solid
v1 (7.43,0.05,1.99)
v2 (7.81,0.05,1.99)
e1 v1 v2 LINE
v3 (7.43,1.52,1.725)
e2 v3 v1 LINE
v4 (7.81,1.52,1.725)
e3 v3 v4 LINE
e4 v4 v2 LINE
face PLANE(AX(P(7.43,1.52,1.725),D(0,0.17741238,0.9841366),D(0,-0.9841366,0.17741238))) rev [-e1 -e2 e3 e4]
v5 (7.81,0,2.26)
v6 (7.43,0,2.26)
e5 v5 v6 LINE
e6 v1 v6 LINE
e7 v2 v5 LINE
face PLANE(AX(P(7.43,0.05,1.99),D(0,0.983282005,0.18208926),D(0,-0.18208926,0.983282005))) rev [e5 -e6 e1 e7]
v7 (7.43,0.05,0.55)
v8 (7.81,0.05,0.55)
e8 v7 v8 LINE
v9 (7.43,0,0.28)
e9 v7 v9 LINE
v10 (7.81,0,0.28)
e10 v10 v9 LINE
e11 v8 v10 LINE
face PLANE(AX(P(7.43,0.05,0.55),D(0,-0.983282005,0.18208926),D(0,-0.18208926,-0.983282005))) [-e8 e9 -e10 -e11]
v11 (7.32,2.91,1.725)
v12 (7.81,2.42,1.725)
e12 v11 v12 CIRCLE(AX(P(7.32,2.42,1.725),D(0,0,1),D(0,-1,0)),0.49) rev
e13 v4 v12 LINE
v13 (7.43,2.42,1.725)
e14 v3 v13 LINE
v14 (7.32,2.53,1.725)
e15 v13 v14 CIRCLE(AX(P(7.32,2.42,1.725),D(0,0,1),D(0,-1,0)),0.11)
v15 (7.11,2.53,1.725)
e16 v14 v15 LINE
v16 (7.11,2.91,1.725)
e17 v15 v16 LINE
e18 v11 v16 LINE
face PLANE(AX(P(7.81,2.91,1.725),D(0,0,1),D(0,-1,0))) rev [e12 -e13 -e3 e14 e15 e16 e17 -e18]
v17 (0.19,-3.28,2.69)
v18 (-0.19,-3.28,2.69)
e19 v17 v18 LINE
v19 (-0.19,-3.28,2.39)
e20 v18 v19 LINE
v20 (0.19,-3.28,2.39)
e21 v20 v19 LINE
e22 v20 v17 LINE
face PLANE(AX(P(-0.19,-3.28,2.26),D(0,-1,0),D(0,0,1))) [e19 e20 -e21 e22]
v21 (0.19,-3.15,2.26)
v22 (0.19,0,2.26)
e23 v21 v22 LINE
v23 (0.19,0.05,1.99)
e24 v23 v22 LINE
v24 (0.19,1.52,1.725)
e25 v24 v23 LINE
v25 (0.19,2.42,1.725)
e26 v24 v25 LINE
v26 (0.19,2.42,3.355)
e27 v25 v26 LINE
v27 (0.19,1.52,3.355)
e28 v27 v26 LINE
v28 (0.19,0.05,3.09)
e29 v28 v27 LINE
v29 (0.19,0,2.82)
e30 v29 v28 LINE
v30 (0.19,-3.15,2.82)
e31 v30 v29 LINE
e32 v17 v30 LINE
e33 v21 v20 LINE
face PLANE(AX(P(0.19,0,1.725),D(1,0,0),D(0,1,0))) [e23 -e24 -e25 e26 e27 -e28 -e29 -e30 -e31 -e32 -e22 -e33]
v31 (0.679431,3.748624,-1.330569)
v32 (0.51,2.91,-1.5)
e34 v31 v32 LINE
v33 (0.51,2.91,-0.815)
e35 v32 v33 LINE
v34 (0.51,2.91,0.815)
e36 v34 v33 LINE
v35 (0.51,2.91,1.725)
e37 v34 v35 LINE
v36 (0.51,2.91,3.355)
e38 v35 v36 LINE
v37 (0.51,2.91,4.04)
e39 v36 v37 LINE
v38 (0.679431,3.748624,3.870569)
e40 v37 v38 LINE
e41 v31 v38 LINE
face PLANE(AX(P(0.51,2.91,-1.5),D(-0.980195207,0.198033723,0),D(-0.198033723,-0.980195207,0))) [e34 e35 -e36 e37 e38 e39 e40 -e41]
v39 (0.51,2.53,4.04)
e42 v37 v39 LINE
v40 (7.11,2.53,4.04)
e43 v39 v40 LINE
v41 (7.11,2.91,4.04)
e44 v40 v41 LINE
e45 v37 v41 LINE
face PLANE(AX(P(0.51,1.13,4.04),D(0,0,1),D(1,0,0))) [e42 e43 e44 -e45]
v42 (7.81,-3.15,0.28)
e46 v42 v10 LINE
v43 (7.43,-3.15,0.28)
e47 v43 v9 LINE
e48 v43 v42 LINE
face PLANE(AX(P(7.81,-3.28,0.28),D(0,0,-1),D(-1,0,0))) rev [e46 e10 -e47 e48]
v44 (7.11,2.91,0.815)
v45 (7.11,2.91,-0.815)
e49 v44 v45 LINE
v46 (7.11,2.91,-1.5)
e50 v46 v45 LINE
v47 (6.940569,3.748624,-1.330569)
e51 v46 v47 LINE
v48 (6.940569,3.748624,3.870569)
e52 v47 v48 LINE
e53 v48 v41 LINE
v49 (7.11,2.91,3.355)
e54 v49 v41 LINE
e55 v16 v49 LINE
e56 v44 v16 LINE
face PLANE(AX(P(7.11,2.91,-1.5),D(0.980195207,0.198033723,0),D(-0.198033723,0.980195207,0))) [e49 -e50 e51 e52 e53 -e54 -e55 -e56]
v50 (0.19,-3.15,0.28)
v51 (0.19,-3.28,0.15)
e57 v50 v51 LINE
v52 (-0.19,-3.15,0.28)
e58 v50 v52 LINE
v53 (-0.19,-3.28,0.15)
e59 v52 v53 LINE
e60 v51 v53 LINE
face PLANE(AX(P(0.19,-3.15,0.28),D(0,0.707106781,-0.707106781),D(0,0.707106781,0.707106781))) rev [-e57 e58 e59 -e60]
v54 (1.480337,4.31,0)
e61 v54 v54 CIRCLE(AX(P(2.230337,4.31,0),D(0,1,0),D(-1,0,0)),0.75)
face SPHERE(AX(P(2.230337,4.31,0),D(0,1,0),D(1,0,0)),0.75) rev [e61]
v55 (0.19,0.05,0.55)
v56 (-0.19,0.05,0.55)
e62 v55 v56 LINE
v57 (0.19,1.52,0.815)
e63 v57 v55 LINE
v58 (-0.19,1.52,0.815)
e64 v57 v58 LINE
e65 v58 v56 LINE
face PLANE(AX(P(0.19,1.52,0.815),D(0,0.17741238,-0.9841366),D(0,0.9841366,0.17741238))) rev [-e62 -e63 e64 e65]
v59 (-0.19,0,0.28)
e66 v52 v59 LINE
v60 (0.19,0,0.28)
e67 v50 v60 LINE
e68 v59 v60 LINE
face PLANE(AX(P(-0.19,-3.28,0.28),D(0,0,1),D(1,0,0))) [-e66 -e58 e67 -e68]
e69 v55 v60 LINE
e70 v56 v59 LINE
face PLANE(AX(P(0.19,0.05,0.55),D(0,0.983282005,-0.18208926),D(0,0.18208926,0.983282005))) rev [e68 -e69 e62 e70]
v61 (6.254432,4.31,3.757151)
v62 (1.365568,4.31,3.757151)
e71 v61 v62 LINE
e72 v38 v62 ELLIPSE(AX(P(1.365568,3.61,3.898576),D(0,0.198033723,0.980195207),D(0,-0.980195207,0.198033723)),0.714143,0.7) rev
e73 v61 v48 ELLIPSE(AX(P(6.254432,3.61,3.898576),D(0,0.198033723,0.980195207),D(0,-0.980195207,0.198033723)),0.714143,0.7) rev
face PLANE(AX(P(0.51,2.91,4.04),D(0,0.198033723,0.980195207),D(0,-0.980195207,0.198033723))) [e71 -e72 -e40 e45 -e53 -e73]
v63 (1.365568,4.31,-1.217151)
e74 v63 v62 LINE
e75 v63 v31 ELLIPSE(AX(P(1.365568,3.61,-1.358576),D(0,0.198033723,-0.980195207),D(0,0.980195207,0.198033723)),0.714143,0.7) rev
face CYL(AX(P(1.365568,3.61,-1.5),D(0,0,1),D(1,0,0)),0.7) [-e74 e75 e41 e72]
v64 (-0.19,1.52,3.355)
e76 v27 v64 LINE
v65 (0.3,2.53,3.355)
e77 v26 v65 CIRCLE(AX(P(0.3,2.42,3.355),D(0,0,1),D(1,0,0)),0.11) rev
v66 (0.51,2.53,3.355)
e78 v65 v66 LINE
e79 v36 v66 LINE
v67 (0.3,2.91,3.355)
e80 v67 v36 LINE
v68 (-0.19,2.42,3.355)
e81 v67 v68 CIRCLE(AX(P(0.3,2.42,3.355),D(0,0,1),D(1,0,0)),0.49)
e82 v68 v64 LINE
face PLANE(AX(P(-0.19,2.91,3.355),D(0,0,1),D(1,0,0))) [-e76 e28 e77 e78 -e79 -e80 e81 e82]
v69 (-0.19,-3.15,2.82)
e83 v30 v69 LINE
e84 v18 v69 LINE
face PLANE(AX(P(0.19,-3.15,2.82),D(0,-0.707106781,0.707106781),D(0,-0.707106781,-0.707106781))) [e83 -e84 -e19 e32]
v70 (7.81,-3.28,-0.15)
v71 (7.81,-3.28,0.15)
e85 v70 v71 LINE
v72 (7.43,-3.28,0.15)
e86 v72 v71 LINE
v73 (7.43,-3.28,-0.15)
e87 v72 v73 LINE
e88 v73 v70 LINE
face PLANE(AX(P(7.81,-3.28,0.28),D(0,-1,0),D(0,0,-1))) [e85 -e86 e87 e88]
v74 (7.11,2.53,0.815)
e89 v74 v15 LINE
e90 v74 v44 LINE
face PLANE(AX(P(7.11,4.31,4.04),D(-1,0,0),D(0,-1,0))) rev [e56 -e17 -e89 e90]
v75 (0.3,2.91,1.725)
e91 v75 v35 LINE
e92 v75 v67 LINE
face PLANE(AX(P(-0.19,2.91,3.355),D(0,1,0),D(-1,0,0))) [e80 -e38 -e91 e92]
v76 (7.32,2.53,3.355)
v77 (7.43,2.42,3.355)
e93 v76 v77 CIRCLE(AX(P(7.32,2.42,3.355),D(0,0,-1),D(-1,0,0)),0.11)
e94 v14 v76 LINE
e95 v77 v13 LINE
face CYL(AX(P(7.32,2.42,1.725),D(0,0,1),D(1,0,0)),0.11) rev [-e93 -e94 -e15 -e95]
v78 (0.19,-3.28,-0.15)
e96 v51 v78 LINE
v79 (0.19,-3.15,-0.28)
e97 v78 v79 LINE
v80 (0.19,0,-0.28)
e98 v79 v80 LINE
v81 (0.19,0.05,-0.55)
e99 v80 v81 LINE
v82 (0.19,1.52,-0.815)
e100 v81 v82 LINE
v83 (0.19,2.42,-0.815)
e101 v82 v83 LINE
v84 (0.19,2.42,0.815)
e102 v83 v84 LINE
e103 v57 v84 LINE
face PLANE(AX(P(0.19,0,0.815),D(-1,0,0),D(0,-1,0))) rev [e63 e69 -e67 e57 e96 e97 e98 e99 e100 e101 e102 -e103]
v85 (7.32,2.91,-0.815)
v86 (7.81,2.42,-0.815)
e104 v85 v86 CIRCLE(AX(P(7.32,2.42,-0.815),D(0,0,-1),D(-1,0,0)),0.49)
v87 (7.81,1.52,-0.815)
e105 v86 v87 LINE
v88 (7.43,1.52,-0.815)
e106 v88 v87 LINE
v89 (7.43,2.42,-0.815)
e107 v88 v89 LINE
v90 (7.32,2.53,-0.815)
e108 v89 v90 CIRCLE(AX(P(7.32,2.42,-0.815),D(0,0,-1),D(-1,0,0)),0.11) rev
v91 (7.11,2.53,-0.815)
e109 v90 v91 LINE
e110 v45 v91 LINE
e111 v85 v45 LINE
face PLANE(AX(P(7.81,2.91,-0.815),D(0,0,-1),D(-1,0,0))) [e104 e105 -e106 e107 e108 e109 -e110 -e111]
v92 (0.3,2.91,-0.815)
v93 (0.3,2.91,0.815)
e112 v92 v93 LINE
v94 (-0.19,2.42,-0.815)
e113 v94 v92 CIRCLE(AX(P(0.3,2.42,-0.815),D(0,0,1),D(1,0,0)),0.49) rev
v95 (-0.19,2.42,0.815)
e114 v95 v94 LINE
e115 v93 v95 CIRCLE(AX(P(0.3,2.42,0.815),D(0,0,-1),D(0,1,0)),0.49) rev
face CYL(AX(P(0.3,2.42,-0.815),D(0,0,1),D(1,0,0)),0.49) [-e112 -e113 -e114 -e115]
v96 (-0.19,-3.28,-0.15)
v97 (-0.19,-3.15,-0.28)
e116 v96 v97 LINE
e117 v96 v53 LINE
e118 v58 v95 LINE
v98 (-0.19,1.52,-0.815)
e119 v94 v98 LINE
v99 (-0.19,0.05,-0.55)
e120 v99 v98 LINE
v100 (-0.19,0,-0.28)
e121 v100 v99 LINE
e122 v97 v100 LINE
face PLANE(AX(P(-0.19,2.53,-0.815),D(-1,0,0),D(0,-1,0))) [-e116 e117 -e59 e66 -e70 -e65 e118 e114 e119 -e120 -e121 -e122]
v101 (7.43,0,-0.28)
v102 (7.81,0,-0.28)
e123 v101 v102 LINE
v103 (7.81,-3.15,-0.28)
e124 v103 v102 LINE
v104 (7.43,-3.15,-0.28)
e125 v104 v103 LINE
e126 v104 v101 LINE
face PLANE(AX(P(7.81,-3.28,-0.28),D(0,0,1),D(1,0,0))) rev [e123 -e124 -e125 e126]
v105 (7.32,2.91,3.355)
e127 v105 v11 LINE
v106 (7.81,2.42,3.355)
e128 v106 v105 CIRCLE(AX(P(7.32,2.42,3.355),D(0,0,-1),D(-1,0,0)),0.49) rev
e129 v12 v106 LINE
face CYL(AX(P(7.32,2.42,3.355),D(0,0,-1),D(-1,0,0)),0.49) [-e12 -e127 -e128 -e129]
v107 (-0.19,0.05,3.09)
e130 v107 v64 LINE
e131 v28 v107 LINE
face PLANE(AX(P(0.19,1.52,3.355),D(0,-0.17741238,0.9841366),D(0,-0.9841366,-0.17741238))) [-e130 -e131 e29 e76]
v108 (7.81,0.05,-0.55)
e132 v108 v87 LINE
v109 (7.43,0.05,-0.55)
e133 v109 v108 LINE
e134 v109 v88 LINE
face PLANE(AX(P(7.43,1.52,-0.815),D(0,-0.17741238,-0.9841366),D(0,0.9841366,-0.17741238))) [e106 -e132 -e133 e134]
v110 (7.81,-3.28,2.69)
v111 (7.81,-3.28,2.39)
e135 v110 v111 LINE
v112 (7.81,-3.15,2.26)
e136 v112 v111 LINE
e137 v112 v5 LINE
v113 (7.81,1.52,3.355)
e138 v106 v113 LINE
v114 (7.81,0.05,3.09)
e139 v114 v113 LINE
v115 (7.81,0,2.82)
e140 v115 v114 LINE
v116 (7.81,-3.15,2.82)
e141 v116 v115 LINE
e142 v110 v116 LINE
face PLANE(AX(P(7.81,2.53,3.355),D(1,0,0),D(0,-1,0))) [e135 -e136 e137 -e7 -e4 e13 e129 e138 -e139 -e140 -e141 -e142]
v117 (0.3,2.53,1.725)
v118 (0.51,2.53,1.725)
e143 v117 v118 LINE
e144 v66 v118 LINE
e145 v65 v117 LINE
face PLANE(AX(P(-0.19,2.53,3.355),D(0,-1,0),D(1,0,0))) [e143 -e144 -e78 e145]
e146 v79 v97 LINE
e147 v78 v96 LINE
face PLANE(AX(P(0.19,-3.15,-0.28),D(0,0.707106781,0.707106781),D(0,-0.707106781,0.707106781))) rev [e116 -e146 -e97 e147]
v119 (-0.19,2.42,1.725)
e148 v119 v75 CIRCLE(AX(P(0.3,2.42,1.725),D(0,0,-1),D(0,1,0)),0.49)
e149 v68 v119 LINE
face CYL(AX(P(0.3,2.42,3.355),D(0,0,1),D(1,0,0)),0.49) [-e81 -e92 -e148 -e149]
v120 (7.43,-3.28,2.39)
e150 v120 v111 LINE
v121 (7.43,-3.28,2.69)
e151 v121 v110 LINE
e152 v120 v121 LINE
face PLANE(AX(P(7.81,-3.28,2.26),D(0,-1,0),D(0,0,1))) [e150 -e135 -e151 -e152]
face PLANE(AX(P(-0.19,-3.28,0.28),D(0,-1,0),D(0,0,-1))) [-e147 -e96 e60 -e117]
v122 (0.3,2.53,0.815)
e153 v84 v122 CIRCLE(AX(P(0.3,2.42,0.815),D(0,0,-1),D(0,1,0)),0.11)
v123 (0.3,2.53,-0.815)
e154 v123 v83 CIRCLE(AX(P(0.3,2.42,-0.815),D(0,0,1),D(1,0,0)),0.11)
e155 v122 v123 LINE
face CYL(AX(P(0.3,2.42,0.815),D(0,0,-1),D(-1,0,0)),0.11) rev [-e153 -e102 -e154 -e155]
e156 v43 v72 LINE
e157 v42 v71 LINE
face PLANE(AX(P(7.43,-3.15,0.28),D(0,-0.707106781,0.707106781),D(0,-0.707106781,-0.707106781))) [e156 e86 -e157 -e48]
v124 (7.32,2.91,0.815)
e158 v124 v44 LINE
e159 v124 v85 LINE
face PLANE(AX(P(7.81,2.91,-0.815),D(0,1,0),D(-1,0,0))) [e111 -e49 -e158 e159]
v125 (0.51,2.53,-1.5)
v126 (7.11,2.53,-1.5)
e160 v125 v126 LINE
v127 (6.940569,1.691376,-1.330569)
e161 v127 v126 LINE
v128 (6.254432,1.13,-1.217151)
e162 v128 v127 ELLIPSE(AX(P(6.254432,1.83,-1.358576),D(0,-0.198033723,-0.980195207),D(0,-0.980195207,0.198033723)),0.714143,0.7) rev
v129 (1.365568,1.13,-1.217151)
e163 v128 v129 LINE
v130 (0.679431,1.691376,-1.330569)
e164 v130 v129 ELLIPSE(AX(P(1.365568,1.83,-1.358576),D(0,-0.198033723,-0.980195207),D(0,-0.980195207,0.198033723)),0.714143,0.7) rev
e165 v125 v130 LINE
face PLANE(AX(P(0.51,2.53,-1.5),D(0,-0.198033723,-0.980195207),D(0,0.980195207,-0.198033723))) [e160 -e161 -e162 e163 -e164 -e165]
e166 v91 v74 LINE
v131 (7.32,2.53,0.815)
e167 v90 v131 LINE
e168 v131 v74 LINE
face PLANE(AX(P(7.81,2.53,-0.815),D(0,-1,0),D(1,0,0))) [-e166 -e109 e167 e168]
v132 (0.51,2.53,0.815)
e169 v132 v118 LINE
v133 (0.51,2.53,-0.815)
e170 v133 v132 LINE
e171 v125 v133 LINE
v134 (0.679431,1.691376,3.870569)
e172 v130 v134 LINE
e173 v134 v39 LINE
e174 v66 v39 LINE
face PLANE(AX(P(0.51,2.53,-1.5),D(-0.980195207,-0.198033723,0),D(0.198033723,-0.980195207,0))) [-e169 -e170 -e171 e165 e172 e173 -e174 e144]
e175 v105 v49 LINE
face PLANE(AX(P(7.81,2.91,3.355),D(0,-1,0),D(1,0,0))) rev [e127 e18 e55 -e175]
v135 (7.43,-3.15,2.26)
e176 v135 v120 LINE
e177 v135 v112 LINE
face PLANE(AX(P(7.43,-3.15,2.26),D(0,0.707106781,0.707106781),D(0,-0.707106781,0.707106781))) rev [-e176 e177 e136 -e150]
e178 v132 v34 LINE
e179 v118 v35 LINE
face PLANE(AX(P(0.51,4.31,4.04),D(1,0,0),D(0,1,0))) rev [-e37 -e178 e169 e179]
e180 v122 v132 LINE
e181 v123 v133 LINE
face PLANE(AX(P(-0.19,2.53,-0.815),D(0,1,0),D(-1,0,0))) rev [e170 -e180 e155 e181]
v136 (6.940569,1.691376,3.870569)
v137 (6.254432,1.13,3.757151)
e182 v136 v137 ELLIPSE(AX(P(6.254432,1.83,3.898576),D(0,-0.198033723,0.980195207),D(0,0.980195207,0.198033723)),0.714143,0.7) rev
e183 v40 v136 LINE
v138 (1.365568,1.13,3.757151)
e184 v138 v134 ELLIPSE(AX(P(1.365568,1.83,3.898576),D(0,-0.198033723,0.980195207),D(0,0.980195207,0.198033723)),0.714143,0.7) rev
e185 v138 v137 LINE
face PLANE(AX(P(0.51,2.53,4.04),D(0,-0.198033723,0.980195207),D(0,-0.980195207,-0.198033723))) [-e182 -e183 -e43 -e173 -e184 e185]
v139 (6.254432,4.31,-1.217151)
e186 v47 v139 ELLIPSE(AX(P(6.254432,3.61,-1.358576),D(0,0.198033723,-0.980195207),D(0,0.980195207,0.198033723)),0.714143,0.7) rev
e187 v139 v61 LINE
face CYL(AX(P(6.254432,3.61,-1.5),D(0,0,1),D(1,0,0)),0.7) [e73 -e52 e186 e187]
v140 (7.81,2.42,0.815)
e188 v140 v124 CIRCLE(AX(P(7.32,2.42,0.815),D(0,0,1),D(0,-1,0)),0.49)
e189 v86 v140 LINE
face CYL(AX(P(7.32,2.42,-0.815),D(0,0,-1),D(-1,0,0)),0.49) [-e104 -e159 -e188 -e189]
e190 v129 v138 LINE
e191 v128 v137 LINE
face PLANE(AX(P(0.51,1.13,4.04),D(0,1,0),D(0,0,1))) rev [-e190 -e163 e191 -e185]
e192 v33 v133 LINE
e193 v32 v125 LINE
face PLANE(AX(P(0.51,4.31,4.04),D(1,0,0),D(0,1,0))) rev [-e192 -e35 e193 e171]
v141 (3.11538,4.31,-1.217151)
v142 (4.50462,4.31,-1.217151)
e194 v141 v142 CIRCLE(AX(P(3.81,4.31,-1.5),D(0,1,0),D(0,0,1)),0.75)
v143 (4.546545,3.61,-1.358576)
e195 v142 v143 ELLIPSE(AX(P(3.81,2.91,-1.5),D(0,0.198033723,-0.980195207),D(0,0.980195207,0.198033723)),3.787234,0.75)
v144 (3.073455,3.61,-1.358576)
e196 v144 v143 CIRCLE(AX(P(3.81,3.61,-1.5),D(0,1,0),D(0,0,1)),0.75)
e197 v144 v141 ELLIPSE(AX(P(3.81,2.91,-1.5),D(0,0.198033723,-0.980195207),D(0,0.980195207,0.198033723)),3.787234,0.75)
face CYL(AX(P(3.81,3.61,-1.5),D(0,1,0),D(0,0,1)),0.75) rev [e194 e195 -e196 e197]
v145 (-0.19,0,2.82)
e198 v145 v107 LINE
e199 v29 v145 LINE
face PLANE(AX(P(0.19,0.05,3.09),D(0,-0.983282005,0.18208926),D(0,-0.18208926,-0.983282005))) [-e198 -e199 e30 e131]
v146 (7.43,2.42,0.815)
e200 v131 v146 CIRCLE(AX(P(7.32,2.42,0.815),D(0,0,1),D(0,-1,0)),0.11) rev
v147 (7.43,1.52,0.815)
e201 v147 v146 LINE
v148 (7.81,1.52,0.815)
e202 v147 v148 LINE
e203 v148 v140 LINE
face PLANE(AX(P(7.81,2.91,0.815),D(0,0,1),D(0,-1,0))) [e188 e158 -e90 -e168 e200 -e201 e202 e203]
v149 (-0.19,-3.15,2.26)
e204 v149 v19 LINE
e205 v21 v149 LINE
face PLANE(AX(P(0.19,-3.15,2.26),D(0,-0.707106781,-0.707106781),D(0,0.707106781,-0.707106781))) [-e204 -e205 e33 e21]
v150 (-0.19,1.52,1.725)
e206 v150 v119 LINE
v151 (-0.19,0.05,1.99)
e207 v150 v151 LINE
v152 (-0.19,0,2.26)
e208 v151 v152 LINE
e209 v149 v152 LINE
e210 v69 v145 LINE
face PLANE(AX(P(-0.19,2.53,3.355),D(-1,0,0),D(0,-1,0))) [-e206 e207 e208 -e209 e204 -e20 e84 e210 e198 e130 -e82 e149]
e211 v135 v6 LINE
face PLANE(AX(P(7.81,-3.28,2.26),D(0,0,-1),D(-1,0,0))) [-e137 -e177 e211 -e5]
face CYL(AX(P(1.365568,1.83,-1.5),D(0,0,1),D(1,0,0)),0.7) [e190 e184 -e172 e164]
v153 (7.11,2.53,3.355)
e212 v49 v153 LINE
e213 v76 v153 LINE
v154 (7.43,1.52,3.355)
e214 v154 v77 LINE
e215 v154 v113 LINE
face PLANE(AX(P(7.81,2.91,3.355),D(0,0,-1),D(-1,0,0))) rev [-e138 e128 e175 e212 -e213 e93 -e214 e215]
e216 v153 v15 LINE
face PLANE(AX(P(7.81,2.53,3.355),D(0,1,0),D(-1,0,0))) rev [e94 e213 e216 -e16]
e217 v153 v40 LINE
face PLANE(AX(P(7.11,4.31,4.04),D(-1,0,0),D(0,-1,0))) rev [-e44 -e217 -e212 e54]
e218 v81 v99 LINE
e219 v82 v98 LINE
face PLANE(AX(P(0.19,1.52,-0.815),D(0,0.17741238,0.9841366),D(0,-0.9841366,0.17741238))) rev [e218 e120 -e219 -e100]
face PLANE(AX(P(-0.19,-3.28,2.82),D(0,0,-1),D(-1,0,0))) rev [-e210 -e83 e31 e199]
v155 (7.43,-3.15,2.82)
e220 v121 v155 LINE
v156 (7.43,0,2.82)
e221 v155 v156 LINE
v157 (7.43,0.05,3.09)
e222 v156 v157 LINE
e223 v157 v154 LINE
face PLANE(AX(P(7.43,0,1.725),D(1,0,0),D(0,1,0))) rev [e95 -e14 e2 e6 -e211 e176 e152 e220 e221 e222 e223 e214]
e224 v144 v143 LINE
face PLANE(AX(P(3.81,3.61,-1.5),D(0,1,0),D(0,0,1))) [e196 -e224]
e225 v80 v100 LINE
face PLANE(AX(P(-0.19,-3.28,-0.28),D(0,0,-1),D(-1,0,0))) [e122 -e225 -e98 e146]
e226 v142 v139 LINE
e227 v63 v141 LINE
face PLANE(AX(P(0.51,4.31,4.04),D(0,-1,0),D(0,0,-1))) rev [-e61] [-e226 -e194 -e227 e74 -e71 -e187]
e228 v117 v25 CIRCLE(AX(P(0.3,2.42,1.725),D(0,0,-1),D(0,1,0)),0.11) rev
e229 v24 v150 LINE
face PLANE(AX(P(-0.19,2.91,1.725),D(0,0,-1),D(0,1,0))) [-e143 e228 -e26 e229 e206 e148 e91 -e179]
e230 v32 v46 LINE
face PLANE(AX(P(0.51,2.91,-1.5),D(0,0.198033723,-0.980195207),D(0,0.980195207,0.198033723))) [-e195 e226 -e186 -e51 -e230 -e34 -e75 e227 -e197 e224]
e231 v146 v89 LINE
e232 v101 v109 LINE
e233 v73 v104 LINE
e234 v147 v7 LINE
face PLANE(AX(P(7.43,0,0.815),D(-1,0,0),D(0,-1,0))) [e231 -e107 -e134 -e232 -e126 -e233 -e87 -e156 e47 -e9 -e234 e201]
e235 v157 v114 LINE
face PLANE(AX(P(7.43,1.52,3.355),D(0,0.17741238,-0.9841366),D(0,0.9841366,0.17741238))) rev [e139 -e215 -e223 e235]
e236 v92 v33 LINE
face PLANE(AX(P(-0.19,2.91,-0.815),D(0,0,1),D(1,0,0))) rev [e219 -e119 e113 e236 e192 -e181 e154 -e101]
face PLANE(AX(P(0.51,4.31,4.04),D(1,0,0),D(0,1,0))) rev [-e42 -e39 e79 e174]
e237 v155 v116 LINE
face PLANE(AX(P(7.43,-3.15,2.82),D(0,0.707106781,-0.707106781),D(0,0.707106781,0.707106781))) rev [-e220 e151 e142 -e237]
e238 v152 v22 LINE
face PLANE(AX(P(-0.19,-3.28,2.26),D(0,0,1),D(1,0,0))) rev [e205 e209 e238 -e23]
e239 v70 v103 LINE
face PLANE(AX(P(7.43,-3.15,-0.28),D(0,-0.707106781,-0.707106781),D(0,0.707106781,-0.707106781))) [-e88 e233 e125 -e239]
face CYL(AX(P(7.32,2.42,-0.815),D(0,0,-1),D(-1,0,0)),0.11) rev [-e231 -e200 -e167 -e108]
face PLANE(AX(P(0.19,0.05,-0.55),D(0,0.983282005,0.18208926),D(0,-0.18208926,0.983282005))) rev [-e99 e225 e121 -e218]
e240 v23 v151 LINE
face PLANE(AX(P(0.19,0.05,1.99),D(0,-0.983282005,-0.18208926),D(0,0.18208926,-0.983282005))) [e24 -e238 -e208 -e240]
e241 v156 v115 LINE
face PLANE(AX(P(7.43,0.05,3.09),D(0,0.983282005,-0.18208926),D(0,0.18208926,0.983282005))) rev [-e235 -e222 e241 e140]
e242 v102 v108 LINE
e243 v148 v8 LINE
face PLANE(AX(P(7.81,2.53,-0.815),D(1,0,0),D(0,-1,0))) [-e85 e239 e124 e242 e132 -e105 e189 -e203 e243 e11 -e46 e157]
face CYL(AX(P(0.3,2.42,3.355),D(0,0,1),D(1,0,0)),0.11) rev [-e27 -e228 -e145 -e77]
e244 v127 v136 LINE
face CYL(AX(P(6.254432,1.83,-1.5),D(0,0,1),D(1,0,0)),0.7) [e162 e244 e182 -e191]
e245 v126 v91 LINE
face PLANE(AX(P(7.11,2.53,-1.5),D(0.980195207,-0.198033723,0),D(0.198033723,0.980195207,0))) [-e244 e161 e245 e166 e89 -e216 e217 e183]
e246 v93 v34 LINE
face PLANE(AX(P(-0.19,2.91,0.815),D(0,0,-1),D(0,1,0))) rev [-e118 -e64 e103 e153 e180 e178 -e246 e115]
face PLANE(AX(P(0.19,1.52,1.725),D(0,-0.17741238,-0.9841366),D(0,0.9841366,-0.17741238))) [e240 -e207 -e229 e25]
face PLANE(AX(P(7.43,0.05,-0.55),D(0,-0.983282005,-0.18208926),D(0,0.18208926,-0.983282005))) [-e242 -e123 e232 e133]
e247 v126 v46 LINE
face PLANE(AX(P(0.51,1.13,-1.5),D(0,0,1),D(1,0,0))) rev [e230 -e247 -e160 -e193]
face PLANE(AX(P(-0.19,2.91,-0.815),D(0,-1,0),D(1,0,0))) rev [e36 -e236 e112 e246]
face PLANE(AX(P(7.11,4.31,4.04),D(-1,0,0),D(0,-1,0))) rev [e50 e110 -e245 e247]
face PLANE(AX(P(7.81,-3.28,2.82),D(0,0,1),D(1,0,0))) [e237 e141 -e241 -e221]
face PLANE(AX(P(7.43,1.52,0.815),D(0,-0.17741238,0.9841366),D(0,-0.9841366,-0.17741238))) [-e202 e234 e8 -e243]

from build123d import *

# Parameters (mm, degrees)
BASE_EXTRUDE_DEPTH      = 4.04
BASE_EXTRUDE_DEPTH_BACK = 1.5
SKETCH1_W               = 6.6
SKETCH1_H               = 3.18
SKETCH2_OUTSIDE_W       = 10.436
SKETCH2_OUTSIDE_H       = 7.016
CUT_EXTRUDE1_DEPTH      = 10.990985937
SKETCH3_OUTSIDE_W       = 9.376
SKETCH3_OUTSIDE_H       = 7.016
CUT_EXTRUDE2_DEPTH      = 9.857635125
SKETCH5_W               = 1.63
SKETCH5_H               = 0.38
BOSS_EXTRUDE3_DEPTH     = 0.7
SKETCH6_W               = 0.38
SKETCH6_H               = 1.63
BOSS_EXTRUDE4_DEPTH     = 2.53
SKETCH4_W               = 0.38
SKETCH4_H               = 0.56
BOSS_EXTRUDE5_DEPTH     = 3.28
CUT_EXTRUDE5_DEPTH      = 0.38
FILLET1_R               = 0.49
FILLET2_R               = 0.11
FILLET1_OF_MIRROR1_R    = 0.49
FILLET2_OF_MIRROR1_R    = 0.11
SKETCH10_R              = 0.75
CUT_EXTRUDE6_DEPTH      = 0.7


# Read off the part's stored shape, not the designer's step: Mirror2
with BuildPart() as part:
    # Sketch1 → Base-Extrude (new, two sides: drawn at the far end of the back side and taken through both)
    with BuildSketch(Plane.XY.offset(-BASE_EXTRUDE_DEPTH_BACK)):
        with Locations((3.81, 2.72)):
            Rectangle(SKETCH1_W, SKETCH1_H)
    extrude(amount=BASE_EXTRUDE_DEPTH + BASE_EXTRUDE_DEPTH_BACK)

    # Sketch2 outside → Cut-Extrude1 (cut, through all)
    with BuildSketch(Plane.XY.offset(4.04)):
        with Locations((3.81, 2.72)):
            Rectangle(SKETCH2_OUTSIDE_W, SKETCH2_OUTSIDE_H)
        with BuildLine():
            Line((0.51, 2.91), (0.679431307, 3.748623606))
            ThreePointArc((0.679431307, 3.748623606), (0.922305346, 4.151773257), (1.365567952, 4.31))
            Line((1.365567952, 4.31), (6.254432048, 4.31))
            ThreePointArc((6.254432048, 4.31), (6.697694654, 4.151773257), (6.940568693, 3.748623606))
            Line((6.940568693, 3.748623606), (7.11, 2.91))
            Line((7.11, 2.91), (7.11, 2.53))
            Line((7.11, 2.53), (6.940568693, 1.691376394))
            ThreePointArc((6.940568693, 1.691376394), (6.697694654, 1.288226743), (6.254432048, 1.13))
            Line((6.254432048, 1.13), (1.365567952, 1.13))
            ThreePointArc((1.365567952, 1.13), (0.922305346, 1.288226743), (0.679431307, 1.691376394))
            Line((0.679431307, 1.691376394), (0.51, 2.53))
            Line((0.51, 2.53), (0.51, 2.91))
        make_face(mode=Mode.SUBTRACT)
    extrude(amount=-CUT_EXTRUDE1_DEPTH, mode=Mode.SUBTRACT)

    # Sketch3 outside → Cut-Extrude2 (cut, through all)
    with BuildSketch(Plane(origin=(7.11, 0, 0), x_dir=(0, 0, -1), z_dir=(1, 0, 0))):
        with Locations((-1.27, 2.72)):
            Rectangle(SKETCH3_OUTSIDE_W, SKETCH3_OUTSIDE_H)
        Polygon((1.5, 2.91), (1.134316679, 4.72), (-3.674316679, 4.72), (-4.04, 2.91), (-4.04, 2.53), (-3.674316679, 0.72), (1.134316679, 0.72), (1.5, 2.53), align=None, mode=Mode.SUBTRACT)
    extrude(amount=-CUT_EXTRUDE2_DEPTH, mode=Mode.SUBTRACT)

    # Sketch5 → Boss-Extrude3 (add)
    with BuildSketch(Plane.ZY.offset(-0.51)):
        with Locations((0, 2.72)):
            Rectangle(SKETCH5_W, SKETCH5_H)
    boss_extrude3 = extrude(amount=BOSS_EXTRUDE3_DEPTH)

    # Sketch6 → Boss-Extrude4 (add)
    with BuildSketch(Plane.XZ.offset(-2.53)):
        Rectangle(SKETCH6_W, SKETCH6_H)
    boss_extrude4 = extrude(amount=BOSS_EXTRUDE4_DEPTH)

    # Sketch4 → Boss-Extrude5 (add)
    with BuildSketch(Plane(origin=(0, 0, 0), x_dir=(1, 0, 0), z_dir=(0, 1, 0))):
        Rectangle(SKETCH4_W, SKETCH4_H)
    boss_extrude5 = extrude(amount=-BOSS_EXTRUDE5_DEPTH)

    # Sketch7 → Cut-Extrude5 (cut)
    with BuildSketch(Plane.ZY.offset(0.19)):
        Polygon((0.815, 1.52), (0.55, 0.05), (0.28, 0), (0.28, -3.15), (0.15, -3.28), (-0.15, -3.28), (-0.28, -3.15), (-0.28, 0), (-0.55, 0.05), (-0.815, 1.52), (-0.815, -3.78), (0.815, -3.78), align=None)
    cut_extrude5 = extrude(amount=-CUT_EXTRUDE5_DEPTH, mode=Mode.SUBTRACT)

    # Fillet1
    fillet1_edges = [part.edges().sort_by_distance(p)[0] for p in [
        (-0.19, 2.91, 0),
    ]]
    fillet(fillet1_edges, radius=FILLET1_R)

    # Fillet2
    fillet2_edges = [part.edges().sort_by_distance(p)[0] for p in [
        (0.19, 2.53, 0),
    ]]
    fillet(fillet2_edges, radius=FILLET2_R)

    # Mirror1: Boss-Extrude3, Boss-Extrude4, Boss-Extrude5, Cut-Extrude5 across plane
    add(boss_extrude3.mirror(Plane.ZY.offset(-3.81)))
    add(boss_extrude4.mirror(Plane.ZY.offset(-3.81)))
    add(boss_extrude5.mirror(Plane.ZY.offset(-3.81)))
    add(cut_extrude5.mirror(Plane.ZY.offset(-3.81)), mode=Mode.SUBTRACT)

    # Fillet1 of Mirror1
    fillet1_of_mirror1_edges = [part.edges().sort_by_distance(p)[0] for p in [
        (7.81, 2.91, 0),
    ]]
    fillet(fillet1_of_mirror1_edges, radius=FILLET1_OF_MIRROR1_R)

    # Fillet2 of Mirror1
    fillet2_of_mirror1_edges = [part.edges().sort_by_distance(p)[0] for p in [
        (7.43, 2.53, 0),
    ]]
    fillet(fillet2_of_mirror1_edges, radius=FILLET2_OF_MIRROR1_R)

    # Mirror2: part across plane


with BuildPart() as part_1:
    add(part.part)
    add(part.part.mirror(Plane(origin=(0, 0, 1.27), x_dir=(1, 0, 0), z_dir=(0, 0, -1))))

    # Sketch9 → Cut-Revolve1 (revolve, cut)
    with BuildSketch(Plane.XY):
        with BuildLine():
            Line((2.980337349, 4.31), (2.230337349, 4.31))
            Line((2.230337349, 4.31), (2.230337349, 3.56))
            ThreePointArc((2.230337349, 3.56), (2.760667435, 3.779669914), (2.980337349, 4.31))
        make_face()
    revolve(axis=Axis((2.230337349, 5.149947403, 0), (0, -1, 0)), mode=Mode.SUBTRACT)

    # Sketch10 → Cut-Extrude6 (cut)
    with BuildSketch(Plane(origin=(0, 4.31, 0), x_dir=(-1, 0, 0), z_dir=(0, 1, 0))):
        with Locations((-3.81, -1.5)):
            Circle(SKETCH10_R)
    extrude(amount=-CUT_EXTRUDE6_DEPTH, mode=Mode.SUBTRACT)


solid = part_1.part
